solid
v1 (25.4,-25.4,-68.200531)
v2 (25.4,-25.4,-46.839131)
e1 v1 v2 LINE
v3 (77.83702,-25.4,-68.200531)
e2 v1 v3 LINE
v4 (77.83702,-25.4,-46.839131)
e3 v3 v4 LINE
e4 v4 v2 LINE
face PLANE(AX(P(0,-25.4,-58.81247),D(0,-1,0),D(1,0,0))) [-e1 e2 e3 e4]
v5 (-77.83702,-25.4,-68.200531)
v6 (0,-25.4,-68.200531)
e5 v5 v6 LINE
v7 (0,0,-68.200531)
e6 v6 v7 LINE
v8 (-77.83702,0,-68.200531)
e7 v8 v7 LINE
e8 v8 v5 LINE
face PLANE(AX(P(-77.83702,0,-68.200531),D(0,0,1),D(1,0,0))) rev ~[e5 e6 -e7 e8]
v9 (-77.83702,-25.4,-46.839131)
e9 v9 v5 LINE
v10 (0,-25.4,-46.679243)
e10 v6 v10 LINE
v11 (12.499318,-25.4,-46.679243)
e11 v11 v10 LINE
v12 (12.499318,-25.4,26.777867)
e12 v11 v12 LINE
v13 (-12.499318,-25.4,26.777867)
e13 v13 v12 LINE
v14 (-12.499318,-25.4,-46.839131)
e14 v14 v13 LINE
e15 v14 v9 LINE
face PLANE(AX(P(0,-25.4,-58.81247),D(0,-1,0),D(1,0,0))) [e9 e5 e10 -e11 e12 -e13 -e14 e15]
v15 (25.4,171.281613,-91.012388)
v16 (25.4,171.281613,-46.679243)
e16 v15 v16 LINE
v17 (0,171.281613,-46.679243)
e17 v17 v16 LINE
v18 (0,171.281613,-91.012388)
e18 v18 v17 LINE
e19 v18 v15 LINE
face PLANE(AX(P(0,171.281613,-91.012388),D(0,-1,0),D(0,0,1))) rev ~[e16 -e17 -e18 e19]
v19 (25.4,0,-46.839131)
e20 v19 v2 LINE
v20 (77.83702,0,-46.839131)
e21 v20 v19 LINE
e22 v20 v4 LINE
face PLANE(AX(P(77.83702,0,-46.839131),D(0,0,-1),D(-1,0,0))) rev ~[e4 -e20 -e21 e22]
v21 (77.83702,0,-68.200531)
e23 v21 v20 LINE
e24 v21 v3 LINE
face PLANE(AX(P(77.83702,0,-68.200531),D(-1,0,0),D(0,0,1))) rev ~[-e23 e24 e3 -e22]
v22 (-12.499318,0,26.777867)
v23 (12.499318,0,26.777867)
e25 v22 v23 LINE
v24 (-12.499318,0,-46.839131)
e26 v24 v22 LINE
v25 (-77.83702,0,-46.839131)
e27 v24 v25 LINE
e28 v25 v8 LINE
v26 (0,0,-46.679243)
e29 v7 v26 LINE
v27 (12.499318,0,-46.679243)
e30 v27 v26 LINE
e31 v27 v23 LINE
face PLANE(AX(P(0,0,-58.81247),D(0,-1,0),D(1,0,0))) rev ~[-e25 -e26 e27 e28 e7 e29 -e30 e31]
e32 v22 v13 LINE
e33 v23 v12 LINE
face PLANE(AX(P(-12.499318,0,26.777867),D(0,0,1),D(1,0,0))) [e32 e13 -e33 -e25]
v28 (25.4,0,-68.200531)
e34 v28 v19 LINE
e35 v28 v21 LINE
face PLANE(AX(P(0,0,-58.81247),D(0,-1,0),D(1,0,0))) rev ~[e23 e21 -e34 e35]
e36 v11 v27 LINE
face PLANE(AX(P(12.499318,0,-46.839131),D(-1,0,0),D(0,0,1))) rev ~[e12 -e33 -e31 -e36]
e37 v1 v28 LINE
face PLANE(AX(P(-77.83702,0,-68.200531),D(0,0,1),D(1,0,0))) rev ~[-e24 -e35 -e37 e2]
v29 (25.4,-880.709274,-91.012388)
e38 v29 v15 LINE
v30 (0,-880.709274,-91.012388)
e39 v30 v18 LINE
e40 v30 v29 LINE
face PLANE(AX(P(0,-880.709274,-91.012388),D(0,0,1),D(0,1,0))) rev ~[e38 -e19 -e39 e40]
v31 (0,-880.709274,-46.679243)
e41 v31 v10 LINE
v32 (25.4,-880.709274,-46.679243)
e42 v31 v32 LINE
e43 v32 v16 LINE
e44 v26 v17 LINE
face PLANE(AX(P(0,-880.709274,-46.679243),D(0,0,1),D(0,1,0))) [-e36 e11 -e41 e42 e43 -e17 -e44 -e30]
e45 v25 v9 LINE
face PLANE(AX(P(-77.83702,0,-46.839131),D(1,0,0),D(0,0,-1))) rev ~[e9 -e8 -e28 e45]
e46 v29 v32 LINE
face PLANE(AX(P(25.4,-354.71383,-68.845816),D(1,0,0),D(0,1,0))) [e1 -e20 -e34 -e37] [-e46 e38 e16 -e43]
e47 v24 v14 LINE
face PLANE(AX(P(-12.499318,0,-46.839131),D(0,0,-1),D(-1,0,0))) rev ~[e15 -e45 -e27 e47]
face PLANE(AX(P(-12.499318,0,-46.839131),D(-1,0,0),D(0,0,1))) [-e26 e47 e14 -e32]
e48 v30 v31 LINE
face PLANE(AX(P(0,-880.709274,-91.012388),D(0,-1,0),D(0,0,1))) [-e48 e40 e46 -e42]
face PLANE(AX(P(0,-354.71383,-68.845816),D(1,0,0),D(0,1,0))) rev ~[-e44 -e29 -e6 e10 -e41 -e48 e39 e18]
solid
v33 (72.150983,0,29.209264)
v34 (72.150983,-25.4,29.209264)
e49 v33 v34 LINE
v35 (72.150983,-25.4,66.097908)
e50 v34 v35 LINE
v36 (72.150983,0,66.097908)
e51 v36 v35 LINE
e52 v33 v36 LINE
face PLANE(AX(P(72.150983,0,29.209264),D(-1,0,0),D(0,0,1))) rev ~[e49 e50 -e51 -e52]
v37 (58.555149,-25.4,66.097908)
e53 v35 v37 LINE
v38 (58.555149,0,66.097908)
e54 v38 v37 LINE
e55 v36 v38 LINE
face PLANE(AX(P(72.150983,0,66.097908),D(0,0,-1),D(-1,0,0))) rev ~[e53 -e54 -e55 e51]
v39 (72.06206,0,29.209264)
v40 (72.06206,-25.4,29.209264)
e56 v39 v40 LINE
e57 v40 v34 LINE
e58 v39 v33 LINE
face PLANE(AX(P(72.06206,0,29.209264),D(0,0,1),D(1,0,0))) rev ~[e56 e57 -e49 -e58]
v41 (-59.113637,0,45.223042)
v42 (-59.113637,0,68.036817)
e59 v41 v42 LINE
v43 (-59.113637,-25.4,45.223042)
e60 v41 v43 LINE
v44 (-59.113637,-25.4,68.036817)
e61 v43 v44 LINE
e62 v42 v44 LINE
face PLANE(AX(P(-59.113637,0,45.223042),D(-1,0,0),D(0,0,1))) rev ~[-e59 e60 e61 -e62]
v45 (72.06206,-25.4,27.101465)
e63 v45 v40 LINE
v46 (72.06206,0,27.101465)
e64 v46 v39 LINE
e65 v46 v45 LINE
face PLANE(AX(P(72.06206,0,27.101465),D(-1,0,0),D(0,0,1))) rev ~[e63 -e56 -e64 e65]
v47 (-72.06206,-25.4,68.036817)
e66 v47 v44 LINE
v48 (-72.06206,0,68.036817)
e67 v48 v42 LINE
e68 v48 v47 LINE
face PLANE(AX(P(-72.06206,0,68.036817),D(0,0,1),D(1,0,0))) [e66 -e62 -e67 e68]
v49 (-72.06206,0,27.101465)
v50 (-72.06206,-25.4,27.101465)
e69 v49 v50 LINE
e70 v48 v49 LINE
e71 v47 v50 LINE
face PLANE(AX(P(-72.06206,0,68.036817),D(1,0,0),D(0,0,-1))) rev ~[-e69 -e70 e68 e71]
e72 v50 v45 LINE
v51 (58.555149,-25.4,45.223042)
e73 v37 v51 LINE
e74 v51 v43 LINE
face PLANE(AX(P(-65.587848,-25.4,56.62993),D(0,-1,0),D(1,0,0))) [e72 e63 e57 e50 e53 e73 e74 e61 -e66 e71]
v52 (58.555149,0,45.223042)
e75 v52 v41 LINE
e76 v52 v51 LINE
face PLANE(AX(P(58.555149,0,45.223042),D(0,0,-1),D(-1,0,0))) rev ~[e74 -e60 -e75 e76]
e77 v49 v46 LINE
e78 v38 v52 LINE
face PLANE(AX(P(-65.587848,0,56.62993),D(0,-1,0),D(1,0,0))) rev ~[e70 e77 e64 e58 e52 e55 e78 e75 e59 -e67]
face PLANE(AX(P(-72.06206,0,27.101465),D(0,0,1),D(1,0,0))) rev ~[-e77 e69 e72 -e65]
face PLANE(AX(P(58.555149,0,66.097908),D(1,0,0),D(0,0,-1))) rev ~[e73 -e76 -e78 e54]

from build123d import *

# Parameters (mm, degrees)
F0_W     = 24.9986350536
F0_H     = 73.6169979911
F0_H_2   = 20.8740851838
F1_DEPTH = 25.4
F0_W_2   = 12.948423624
F0_H_3   = 22.8137746453
F0_H_4   = 1.4562010765
F0_W_3   = 13.506911695
F0_H_5   = 16.0137787461
F2_W     = 1051.9908871502
F2_H     = 44.3331450224
F3_DEPTH = 25.4


# Not quite as in the source:
# - a feature of the source that left no trace in its solid (it failed there, or was rolled back) is left out


with BuildPart() as f1:
    # F0 (on Front) → F1 (new body)
    with BuildSketch(Plane.XZ):
        Polygon((-12.4993175268, -46.8391307633), (-77.8370201588, -46.8391307633), (-77.8370201588, -68.2005307633), (77.8370201588, -68.2005307633), (77.8370201588, -46.8391307633), (12.4993175268, -46.8391307633), (12.4993175268, -67.7132159472), (-12.4993175268, -67.7132159472), align=None)
        with Locations((0, -10.0306317678)):
            Rectangle(F0_W, F0_H)
        with Locations((0, -57.2761733552)):
            Rectangle(F0_W, F0_H_2)
    extrude(amount=F1_DEPTH)

    # F2 (on Right) → F3 (join)
    with BuildSketch(Plane.YZ):
        with Locations((-354.7138301656, -68.8458159566)):
            Rectangle(F2_W, F2_H)
    extrude(amount=F3_DEPTH)


with BuildPart() as f1b:
    # F0 (on Front) → F1, piece 2 (new body)
    with BuildSketch(Plane.XZ):
        with Locations((-65.5878484249, 56.6299296916)):
            Rectangle(F0_W_2, F0_H_3)
        with Locations((-65.5878484249, 44.4949418306)):
            Rectangle(F0_W_2, F0_H_4)
        Polygon((58.5551485419, 45.2230423689), (-59.1136366129, 45.2230423689), (-59.1136366129, 43.7668412924), (-72.0620602369, 43.7668412924), (-72.0620602369, 27.1014645696), (72.0620602369, 27.1014645696), (72.0620602369, 29.2092636228), (58.5551485419, 29.2092636228), align=None)
        Polygon((58.5551485419, 66.097907722), (58.5551485419, 45.2230423689), (72.0620602369, 45.2230423689), (72.0620602369, 29.2092636228), (72.1509829164, 29.2092636228), (72.1509829164, 66.097907722), align=None)
        with Locations((65.3086043894, 37.2161529958)):
            Rectangle(F0_W_3, F0_H_5)
    extrude(amount=F1_DEPTH)


solid = Compound([f1.part, f1b.part])
